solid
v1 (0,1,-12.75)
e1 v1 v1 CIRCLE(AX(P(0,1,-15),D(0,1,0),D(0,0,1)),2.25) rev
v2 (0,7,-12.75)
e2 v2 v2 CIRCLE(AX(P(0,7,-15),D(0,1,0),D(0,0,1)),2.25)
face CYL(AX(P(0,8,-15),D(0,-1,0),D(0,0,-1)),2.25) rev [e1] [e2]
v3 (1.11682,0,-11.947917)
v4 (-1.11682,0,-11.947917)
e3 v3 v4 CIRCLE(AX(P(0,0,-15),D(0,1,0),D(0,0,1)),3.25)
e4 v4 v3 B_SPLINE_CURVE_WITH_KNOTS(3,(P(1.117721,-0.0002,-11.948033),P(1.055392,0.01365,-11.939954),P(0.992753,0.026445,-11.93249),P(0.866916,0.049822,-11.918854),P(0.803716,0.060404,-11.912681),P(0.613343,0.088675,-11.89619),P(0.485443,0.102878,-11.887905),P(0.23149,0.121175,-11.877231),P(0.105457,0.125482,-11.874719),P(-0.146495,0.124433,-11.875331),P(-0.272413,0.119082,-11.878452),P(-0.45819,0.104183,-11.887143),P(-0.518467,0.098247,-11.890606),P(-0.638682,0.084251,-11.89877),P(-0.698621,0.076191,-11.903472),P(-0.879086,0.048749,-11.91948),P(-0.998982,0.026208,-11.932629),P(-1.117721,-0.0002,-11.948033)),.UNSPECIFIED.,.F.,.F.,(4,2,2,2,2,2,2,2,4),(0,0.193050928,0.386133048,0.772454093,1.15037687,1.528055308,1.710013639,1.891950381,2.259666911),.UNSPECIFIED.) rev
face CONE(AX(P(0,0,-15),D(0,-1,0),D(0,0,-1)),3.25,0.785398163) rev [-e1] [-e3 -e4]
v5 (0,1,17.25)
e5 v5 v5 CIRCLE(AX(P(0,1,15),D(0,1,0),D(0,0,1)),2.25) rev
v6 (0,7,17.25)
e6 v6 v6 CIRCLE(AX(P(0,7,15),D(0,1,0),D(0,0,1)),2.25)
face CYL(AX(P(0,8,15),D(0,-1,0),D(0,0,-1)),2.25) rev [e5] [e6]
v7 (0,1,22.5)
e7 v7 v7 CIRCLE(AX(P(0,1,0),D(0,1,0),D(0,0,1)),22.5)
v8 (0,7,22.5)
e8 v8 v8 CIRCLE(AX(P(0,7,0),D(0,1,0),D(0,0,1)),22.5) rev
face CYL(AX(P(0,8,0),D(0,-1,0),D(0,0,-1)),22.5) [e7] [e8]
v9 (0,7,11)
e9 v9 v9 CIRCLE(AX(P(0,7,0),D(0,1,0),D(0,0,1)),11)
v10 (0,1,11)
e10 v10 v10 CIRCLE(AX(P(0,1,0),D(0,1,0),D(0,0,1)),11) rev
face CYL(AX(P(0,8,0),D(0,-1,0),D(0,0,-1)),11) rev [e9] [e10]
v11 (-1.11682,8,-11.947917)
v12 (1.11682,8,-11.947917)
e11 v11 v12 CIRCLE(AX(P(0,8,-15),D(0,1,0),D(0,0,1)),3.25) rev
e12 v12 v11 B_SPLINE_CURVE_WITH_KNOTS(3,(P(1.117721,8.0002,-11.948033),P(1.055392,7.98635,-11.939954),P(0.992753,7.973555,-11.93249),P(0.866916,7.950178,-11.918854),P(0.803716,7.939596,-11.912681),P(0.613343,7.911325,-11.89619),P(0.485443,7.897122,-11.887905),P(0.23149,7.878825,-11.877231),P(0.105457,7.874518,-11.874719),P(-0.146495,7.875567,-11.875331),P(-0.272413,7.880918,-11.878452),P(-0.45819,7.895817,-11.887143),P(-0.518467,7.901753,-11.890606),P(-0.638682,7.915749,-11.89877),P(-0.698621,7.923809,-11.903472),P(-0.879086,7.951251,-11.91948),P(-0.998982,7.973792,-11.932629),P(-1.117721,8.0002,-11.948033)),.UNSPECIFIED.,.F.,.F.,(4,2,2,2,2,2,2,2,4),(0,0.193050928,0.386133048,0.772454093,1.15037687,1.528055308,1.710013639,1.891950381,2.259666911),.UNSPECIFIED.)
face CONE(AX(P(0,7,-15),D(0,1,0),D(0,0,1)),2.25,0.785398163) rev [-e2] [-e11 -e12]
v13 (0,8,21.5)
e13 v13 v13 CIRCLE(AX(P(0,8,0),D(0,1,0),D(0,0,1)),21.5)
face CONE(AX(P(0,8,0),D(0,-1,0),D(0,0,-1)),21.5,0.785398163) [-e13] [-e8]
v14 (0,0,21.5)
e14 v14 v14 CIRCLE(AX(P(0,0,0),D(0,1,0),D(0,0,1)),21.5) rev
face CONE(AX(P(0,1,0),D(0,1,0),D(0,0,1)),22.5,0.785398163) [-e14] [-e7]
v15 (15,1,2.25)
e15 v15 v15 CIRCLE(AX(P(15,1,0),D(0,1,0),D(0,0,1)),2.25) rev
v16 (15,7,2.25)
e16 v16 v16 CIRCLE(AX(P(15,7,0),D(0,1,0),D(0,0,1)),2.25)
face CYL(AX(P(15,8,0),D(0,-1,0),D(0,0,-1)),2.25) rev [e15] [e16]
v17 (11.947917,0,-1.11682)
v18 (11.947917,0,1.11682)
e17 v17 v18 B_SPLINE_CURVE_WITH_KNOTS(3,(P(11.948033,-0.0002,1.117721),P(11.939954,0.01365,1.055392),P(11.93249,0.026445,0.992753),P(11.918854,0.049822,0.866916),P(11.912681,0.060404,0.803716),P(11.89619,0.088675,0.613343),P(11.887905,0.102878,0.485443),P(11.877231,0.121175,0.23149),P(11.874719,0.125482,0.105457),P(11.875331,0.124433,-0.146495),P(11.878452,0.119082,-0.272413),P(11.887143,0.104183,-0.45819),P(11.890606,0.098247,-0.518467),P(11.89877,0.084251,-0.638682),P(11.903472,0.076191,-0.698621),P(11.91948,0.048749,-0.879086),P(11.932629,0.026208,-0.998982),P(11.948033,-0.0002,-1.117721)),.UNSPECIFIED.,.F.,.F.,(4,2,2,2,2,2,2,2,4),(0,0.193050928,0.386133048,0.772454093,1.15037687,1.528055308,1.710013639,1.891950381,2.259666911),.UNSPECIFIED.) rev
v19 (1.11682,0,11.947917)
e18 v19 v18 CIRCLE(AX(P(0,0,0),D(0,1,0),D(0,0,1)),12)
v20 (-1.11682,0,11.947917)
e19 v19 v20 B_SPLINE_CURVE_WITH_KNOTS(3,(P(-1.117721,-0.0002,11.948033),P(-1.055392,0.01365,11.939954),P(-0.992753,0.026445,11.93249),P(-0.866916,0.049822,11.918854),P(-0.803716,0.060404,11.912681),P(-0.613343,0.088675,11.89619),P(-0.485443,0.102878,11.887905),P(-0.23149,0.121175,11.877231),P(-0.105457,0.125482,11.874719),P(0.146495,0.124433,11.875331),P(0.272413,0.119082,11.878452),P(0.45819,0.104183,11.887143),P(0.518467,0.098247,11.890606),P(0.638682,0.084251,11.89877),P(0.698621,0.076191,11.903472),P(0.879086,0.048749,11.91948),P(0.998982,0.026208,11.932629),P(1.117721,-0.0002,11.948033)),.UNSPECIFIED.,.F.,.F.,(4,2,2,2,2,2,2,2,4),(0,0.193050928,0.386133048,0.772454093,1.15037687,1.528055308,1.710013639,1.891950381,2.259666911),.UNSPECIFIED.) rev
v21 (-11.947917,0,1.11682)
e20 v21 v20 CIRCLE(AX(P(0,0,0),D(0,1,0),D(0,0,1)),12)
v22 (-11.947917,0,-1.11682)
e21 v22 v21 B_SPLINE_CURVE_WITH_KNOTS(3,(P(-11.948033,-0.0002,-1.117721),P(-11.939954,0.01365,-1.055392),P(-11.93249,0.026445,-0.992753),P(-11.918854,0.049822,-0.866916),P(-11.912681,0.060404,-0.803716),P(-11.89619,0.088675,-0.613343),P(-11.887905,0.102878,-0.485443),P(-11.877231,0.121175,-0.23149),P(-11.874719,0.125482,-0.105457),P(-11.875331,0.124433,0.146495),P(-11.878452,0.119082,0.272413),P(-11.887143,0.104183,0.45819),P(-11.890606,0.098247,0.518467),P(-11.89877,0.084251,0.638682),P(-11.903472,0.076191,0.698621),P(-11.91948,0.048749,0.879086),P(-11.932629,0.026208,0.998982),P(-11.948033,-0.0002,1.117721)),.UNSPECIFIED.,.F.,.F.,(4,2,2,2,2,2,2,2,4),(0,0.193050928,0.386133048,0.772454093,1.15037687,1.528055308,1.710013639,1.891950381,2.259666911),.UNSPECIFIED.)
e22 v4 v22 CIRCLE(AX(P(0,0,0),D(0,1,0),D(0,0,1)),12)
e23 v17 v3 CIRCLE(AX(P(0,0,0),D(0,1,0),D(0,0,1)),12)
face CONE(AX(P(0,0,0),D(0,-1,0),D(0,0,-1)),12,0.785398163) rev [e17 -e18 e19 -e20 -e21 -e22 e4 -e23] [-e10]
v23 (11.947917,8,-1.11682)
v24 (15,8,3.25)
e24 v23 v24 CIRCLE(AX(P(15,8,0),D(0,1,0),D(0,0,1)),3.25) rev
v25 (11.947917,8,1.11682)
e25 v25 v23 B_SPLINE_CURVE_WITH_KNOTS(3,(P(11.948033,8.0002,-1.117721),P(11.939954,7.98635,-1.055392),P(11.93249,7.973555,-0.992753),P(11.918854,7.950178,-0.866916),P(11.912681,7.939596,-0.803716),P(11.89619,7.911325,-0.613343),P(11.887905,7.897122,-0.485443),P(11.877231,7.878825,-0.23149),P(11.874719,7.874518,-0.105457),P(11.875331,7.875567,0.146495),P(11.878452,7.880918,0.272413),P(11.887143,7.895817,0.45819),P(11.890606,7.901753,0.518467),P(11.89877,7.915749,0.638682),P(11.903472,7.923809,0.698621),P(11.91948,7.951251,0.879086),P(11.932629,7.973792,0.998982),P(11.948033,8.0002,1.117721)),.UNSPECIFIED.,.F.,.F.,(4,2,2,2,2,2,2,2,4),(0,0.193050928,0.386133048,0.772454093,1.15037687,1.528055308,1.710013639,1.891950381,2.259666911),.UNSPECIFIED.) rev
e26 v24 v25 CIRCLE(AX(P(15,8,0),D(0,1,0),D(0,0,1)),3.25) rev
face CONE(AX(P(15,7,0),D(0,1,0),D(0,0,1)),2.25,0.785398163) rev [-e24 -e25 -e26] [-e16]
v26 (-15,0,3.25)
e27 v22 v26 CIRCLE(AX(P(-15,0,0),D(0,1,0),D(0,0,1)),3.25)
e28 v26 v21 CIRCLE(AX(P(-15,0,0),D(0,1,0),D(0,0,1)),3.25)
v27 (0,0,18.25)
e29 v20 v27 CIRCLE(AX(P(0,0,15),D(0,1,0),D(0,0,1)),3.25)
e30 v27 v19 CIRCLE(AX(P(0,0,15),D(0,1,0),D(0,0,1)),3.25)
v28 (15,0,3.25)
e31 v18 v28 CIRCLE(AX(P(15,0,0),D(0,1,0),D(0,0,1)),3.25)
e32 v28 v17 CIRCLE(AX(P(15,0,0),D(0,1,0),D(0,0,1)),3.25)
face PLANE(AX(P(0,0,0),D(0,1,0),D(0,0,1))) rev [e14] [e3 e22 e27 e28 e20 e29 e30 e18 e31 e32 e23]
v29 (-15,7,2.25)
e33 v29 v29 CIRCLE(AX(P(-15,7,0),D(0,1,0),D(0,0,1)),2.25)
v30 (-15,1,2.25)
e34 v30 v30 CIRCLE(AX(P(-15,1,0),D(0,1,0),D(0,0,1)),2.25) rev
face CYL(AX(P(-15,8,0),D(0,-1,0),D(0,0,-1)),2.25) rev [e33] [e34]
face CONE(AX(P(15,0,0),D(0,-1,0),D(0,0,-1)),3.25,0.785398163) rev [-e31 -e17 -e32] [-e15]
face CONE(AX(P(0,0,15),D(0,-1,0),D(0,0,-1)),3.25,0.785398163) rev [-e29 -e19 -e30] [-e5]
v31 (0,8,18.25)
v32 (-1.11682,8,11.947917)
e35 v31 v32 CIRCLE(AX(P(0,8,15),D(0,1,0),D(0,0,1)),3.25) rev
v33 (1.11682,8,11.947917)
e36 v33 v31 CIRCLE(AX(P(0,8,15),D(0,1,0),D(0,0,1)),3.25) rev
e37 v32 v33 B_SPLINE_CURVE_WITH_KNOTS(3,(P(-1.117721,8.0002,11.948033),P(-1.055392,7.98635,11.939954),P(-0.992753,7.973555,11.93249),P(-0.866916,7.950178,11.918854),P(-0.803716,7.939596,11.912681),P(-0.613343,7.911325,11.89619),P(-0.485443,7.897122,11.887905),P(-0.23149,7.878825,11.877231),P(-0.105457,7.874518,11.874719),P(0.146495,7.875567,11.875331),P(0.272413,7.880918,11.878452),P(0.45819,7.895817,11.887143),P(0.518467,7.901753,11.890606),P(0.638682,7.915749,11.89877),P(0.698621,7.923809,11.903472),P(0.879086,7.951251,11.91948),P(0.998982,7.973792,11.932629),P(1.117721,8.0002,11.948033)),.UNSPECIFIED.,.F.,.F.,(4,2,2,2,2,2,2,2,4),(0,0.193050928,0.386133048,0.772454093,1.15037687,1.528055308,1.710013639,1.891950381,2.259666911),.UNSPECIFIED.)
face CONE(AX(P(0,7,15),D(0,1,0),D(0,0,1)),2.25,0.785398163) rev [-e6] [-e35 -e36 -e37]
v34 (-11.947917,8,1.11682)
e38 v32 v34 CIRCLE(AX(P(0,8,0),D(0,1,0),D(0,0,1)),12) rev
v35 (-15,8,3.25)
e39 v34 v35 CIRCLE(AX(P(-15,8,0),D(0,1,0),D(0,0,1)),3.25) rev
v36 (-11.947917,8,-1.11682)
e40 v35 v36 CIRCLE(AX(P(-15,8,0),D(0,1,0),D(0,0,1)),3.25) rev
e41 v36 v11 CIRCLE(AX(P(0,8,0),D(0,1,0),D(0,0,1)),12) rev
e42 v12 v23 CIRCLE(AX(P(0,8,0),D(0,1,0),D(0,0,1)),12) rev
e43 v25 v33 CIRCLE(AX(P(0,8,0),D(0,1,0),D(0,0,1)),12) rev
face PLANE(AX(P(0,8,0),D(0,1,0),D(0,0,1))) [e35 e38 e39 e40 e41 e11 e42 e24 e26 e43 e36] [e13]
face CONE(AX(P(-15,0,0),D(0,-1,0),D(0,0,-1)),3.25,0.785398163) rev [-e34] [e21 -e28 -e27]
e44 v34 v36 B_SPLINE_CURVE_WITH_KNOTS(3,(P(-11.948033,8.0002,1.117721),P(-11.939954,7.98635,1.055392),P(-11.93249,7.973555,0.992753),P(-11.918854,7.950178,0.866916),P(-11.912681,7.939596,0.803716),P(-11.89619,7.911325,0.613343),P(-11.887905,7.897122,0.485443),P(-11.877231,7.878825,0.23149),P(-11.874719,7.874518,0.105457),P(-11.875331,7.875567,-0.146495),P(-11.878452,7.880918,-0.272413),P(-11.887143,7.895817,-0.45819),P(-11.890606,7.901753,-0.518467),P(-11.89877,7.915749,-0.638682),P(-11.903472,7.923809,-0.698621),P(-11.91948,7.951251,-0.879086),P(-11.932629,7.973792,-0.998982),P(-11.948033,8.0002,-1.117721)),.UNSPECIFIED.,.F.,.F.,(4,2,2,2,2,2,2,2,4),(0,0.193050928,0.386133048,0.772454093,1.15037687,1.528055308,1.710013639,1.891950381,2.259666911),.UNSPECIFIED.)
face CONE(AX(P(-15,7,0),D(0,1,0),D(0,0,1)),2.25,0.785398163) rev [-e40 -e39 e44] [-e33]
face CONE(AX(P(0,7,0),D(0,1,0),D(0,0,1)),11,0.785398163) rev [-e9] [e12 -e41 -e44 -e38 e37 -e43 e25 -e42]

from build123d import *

# Parameters (mm, degrees)
SKETCH1_R           = 22.5
SKETCH1_R_2         = 11
SKETCH1_R_3         = 2.25
BOSS_EXTRUDE1_DEPTH = 8
CHAMFER1_SIZE       = 1


with BuildPart() as part:
    # Sketch1 → Boss-Extrude1 (new body)
    with BuildSketch(Plane(origin=(0, 0, 0), x_dir=(1, 0, 0), z_dir=(0, 1, 0))):
        with Locations(Location((0, 0, 0), (0, 0, 270))):
            Circle(SKETCH1_R)
        with Locations(Location((0, 0, 0), (0, 0, 270))):
            Circle(SKETCH1_R_2, mode=Mode.SUBTRACT)
        with Locations(Location((-15, 0, 0), (0, 0, 270))):
            Circle(SKETCH1_R_3, mode=Mode.SUBTRACT)
        with Locations(Location((15, 0, 0), (0, 0, 270))):
            Circle(SKETCH1_R_3, mode=Mode.SUBTRACT)
        with Locations(Location((0, -15, 0), (0, 0, 270))):
            Circle(SKETCH1_R_3, mode=Mode.SUBTRACT)
        with Locations(Location((0, 15, 0), (0, 0, 270))):
            Circle(SKETCH1_R_3, mode=Mode.SUBTRACT)
    extrude(amount=BOSS_EXTRUDE1_DEPTH)

    # Chamfer1
    # the kernel refuses this chamfer: 1 mm, written as the material it takes off along each edge
    with BuildSketch(Plane(origin=(15, 0, 0), x_dir=(0, 0, 1), z_dir=(-1, 0, 0))) as chamfer1_piece_1:
        Polygon((2.25, CHAMFER1_SIZE), (2.25 + CHAMFER1_SIZE, 0), (2.25, 0), align=None)
    revolve(axis=Axis((15, 0, 0), (0, 1, 0)), mode=Mode.SUBTRACT)
    with BuildSketch(Plane(origin=(15, 8, 0), x_dir=(0, 0, 1), z_dir=(-1, 0, 0))) as chamfer1_piece_2:
        Polygon((2.25, -CHAMFER1_SIZE), (2.25 + CHAMFER1_SIZE, 0), (2.25, 0), align=None)
    revolve(axis=Axis((15, 8, 0), (0, 1, 0)), mode=Mode.SUBTRACT)
    with BuildSketch(Plane(origin=(0, 0, -15), x_dir=(0, 0, 1), z_dir=(-1, 0, 0))) as chamfer1_piece_3:
        Polygon((2.25, CHAMFER1_SIZE), (2.25 + CHAMFER1_SIZE, 0), (2.25, 0), align=None)
    revolve(axis=Axis((0, 0, -15), (0, 1, 0)), mode=Mode.SUBTRACT)
    with BuildSketch(Plane(origin=(0, 8, -15), x_dir=(0, 0, 1), z_dir=(-1, 0, 0))) as chamfer1_piece_4:
        Polygon((2.25, -CHAMFER1_SIZE), (2.25 + CHAMFER1_SIZE, 0), (2.25, 0), align=None)
    revolve(axis=Axis((0, 8, -15), (0, 1, 0)), mode=Mode.SUBTRACT)
    with BuildSketch(Plane(origin=(0, 0, 0), x_dir=(0, 0, 1), z_dir=(-1, 0, 0))) as chamfer1_piece_5:
        Polygon((22.5, CHAMFER1_SIZE), (22.5 - CHAMFER1_SIZE, 0), (22.5, 0), align=None)
    revolve(axis=Axis((0, 0, 0), (0, 1, 0)), mode=Mode.SUBTRACT)
    with BuildSketch(Plane(origin=(-15, 0, 0), x_dir=(0, 0, 1), z_dir=(-1, 0, 0))) as chamfer1_piece_6:
        Polygon((2.25, CHAMFER1_SIZE), (2.25 + CHAMFER1_SIZE, 0), (2.25, 0), align=None)
    revolve(axis=Axis((-15, 0, 0), (0, 1, 0)), mode=Mode.SUBTRACT)
    with BuildSketch(Plane(origin=(-15, 8, 0), x_dir=(0, 0, 1), z_dir=(-1, 0, 0))) as chamfer1_piece_7:
        Polygon((2.25, -CHAMFER1_SIZE), (2.25 + CHAMFER1_SIZE, 0), (2.25, 0), align=None)
    revolve(axis=Axis((-15, 8, 0), (0, 1, 0)), mode=Mode.SUBTRACT)
    with BuildSketch(Plane(origin=(0, 8, 0), x_dir=(0, 0, 1), z_dir=(-1, 0, 0))) as chamfer1_piece_8:
        Polygon((22.5, -CHAMFER1_SIZE), (22.5 - CHAMFER1_SIZE, 0), (22.5, 0), align=None)
    revolve(axis=Axis((0, 8, 0), (0, 1, 0)), mode=Mode.SUBTRACT)
    with BuildSketch(Plane(origin=(0, 0, 0), x_dir=(0, 0, 1), z_dir=(-1, 0, 0))) as chamfer1_piece_9:
        Polygon((11, CHAMFER1_SIZE), (11 + CHAMFER1_SIZE, 0), (11, 0), align=None)
    revolve(axis=Axis((0, 0, 0), (0, 1, 0)), mode=Mode.SUBTRACT)
    with BuildSketch(Plane(origin=(0, 8, 0), x_dir=(0, 0, 1), z_dir=(-1, 0, 0))) as chamfer1_piece_10:
        Polygon((11, -CHAMFER1_SIZE), (11 + CHAMFER1_SIZE, 0), (11, 0), align=None)
    revolve(axis=Axis((0, 8, 0), (0, 1, 0)), mode=Mode.SUBTRACT)
    with BuildSketch(Plane(origin=(0, 0, 15), x_dir=(0, 0, 1), z_dir=(-1, 0, 0))) as chamfer1_piece_11:
        Polygon((2.25, CHAMFER1_SIZE), (2.25 + CHAMFER1_SIZE, 0), (2.25, 0), align=None)
    revolve(axis=Axis((0, 0, 15), (0, 1, 0)), mode=Mode.SUBTRACT)
    with BuildSketch(Plane(origin=(0, 8, 15), x_dir=(0, 0, 1), z_dir=(-1, 0, 0))) as chamfer1_piece_12:
        Polygon((2.25, -CHAMFER1_SIZE), (2.25 + CHAMFER1_SIZE, 0), (2.25, 0), align=None)
    revolve(axis=Axis((0, 8, 15), (0, 1, 0)), mode=Mode.SUBTRACT)


solid = part.part
